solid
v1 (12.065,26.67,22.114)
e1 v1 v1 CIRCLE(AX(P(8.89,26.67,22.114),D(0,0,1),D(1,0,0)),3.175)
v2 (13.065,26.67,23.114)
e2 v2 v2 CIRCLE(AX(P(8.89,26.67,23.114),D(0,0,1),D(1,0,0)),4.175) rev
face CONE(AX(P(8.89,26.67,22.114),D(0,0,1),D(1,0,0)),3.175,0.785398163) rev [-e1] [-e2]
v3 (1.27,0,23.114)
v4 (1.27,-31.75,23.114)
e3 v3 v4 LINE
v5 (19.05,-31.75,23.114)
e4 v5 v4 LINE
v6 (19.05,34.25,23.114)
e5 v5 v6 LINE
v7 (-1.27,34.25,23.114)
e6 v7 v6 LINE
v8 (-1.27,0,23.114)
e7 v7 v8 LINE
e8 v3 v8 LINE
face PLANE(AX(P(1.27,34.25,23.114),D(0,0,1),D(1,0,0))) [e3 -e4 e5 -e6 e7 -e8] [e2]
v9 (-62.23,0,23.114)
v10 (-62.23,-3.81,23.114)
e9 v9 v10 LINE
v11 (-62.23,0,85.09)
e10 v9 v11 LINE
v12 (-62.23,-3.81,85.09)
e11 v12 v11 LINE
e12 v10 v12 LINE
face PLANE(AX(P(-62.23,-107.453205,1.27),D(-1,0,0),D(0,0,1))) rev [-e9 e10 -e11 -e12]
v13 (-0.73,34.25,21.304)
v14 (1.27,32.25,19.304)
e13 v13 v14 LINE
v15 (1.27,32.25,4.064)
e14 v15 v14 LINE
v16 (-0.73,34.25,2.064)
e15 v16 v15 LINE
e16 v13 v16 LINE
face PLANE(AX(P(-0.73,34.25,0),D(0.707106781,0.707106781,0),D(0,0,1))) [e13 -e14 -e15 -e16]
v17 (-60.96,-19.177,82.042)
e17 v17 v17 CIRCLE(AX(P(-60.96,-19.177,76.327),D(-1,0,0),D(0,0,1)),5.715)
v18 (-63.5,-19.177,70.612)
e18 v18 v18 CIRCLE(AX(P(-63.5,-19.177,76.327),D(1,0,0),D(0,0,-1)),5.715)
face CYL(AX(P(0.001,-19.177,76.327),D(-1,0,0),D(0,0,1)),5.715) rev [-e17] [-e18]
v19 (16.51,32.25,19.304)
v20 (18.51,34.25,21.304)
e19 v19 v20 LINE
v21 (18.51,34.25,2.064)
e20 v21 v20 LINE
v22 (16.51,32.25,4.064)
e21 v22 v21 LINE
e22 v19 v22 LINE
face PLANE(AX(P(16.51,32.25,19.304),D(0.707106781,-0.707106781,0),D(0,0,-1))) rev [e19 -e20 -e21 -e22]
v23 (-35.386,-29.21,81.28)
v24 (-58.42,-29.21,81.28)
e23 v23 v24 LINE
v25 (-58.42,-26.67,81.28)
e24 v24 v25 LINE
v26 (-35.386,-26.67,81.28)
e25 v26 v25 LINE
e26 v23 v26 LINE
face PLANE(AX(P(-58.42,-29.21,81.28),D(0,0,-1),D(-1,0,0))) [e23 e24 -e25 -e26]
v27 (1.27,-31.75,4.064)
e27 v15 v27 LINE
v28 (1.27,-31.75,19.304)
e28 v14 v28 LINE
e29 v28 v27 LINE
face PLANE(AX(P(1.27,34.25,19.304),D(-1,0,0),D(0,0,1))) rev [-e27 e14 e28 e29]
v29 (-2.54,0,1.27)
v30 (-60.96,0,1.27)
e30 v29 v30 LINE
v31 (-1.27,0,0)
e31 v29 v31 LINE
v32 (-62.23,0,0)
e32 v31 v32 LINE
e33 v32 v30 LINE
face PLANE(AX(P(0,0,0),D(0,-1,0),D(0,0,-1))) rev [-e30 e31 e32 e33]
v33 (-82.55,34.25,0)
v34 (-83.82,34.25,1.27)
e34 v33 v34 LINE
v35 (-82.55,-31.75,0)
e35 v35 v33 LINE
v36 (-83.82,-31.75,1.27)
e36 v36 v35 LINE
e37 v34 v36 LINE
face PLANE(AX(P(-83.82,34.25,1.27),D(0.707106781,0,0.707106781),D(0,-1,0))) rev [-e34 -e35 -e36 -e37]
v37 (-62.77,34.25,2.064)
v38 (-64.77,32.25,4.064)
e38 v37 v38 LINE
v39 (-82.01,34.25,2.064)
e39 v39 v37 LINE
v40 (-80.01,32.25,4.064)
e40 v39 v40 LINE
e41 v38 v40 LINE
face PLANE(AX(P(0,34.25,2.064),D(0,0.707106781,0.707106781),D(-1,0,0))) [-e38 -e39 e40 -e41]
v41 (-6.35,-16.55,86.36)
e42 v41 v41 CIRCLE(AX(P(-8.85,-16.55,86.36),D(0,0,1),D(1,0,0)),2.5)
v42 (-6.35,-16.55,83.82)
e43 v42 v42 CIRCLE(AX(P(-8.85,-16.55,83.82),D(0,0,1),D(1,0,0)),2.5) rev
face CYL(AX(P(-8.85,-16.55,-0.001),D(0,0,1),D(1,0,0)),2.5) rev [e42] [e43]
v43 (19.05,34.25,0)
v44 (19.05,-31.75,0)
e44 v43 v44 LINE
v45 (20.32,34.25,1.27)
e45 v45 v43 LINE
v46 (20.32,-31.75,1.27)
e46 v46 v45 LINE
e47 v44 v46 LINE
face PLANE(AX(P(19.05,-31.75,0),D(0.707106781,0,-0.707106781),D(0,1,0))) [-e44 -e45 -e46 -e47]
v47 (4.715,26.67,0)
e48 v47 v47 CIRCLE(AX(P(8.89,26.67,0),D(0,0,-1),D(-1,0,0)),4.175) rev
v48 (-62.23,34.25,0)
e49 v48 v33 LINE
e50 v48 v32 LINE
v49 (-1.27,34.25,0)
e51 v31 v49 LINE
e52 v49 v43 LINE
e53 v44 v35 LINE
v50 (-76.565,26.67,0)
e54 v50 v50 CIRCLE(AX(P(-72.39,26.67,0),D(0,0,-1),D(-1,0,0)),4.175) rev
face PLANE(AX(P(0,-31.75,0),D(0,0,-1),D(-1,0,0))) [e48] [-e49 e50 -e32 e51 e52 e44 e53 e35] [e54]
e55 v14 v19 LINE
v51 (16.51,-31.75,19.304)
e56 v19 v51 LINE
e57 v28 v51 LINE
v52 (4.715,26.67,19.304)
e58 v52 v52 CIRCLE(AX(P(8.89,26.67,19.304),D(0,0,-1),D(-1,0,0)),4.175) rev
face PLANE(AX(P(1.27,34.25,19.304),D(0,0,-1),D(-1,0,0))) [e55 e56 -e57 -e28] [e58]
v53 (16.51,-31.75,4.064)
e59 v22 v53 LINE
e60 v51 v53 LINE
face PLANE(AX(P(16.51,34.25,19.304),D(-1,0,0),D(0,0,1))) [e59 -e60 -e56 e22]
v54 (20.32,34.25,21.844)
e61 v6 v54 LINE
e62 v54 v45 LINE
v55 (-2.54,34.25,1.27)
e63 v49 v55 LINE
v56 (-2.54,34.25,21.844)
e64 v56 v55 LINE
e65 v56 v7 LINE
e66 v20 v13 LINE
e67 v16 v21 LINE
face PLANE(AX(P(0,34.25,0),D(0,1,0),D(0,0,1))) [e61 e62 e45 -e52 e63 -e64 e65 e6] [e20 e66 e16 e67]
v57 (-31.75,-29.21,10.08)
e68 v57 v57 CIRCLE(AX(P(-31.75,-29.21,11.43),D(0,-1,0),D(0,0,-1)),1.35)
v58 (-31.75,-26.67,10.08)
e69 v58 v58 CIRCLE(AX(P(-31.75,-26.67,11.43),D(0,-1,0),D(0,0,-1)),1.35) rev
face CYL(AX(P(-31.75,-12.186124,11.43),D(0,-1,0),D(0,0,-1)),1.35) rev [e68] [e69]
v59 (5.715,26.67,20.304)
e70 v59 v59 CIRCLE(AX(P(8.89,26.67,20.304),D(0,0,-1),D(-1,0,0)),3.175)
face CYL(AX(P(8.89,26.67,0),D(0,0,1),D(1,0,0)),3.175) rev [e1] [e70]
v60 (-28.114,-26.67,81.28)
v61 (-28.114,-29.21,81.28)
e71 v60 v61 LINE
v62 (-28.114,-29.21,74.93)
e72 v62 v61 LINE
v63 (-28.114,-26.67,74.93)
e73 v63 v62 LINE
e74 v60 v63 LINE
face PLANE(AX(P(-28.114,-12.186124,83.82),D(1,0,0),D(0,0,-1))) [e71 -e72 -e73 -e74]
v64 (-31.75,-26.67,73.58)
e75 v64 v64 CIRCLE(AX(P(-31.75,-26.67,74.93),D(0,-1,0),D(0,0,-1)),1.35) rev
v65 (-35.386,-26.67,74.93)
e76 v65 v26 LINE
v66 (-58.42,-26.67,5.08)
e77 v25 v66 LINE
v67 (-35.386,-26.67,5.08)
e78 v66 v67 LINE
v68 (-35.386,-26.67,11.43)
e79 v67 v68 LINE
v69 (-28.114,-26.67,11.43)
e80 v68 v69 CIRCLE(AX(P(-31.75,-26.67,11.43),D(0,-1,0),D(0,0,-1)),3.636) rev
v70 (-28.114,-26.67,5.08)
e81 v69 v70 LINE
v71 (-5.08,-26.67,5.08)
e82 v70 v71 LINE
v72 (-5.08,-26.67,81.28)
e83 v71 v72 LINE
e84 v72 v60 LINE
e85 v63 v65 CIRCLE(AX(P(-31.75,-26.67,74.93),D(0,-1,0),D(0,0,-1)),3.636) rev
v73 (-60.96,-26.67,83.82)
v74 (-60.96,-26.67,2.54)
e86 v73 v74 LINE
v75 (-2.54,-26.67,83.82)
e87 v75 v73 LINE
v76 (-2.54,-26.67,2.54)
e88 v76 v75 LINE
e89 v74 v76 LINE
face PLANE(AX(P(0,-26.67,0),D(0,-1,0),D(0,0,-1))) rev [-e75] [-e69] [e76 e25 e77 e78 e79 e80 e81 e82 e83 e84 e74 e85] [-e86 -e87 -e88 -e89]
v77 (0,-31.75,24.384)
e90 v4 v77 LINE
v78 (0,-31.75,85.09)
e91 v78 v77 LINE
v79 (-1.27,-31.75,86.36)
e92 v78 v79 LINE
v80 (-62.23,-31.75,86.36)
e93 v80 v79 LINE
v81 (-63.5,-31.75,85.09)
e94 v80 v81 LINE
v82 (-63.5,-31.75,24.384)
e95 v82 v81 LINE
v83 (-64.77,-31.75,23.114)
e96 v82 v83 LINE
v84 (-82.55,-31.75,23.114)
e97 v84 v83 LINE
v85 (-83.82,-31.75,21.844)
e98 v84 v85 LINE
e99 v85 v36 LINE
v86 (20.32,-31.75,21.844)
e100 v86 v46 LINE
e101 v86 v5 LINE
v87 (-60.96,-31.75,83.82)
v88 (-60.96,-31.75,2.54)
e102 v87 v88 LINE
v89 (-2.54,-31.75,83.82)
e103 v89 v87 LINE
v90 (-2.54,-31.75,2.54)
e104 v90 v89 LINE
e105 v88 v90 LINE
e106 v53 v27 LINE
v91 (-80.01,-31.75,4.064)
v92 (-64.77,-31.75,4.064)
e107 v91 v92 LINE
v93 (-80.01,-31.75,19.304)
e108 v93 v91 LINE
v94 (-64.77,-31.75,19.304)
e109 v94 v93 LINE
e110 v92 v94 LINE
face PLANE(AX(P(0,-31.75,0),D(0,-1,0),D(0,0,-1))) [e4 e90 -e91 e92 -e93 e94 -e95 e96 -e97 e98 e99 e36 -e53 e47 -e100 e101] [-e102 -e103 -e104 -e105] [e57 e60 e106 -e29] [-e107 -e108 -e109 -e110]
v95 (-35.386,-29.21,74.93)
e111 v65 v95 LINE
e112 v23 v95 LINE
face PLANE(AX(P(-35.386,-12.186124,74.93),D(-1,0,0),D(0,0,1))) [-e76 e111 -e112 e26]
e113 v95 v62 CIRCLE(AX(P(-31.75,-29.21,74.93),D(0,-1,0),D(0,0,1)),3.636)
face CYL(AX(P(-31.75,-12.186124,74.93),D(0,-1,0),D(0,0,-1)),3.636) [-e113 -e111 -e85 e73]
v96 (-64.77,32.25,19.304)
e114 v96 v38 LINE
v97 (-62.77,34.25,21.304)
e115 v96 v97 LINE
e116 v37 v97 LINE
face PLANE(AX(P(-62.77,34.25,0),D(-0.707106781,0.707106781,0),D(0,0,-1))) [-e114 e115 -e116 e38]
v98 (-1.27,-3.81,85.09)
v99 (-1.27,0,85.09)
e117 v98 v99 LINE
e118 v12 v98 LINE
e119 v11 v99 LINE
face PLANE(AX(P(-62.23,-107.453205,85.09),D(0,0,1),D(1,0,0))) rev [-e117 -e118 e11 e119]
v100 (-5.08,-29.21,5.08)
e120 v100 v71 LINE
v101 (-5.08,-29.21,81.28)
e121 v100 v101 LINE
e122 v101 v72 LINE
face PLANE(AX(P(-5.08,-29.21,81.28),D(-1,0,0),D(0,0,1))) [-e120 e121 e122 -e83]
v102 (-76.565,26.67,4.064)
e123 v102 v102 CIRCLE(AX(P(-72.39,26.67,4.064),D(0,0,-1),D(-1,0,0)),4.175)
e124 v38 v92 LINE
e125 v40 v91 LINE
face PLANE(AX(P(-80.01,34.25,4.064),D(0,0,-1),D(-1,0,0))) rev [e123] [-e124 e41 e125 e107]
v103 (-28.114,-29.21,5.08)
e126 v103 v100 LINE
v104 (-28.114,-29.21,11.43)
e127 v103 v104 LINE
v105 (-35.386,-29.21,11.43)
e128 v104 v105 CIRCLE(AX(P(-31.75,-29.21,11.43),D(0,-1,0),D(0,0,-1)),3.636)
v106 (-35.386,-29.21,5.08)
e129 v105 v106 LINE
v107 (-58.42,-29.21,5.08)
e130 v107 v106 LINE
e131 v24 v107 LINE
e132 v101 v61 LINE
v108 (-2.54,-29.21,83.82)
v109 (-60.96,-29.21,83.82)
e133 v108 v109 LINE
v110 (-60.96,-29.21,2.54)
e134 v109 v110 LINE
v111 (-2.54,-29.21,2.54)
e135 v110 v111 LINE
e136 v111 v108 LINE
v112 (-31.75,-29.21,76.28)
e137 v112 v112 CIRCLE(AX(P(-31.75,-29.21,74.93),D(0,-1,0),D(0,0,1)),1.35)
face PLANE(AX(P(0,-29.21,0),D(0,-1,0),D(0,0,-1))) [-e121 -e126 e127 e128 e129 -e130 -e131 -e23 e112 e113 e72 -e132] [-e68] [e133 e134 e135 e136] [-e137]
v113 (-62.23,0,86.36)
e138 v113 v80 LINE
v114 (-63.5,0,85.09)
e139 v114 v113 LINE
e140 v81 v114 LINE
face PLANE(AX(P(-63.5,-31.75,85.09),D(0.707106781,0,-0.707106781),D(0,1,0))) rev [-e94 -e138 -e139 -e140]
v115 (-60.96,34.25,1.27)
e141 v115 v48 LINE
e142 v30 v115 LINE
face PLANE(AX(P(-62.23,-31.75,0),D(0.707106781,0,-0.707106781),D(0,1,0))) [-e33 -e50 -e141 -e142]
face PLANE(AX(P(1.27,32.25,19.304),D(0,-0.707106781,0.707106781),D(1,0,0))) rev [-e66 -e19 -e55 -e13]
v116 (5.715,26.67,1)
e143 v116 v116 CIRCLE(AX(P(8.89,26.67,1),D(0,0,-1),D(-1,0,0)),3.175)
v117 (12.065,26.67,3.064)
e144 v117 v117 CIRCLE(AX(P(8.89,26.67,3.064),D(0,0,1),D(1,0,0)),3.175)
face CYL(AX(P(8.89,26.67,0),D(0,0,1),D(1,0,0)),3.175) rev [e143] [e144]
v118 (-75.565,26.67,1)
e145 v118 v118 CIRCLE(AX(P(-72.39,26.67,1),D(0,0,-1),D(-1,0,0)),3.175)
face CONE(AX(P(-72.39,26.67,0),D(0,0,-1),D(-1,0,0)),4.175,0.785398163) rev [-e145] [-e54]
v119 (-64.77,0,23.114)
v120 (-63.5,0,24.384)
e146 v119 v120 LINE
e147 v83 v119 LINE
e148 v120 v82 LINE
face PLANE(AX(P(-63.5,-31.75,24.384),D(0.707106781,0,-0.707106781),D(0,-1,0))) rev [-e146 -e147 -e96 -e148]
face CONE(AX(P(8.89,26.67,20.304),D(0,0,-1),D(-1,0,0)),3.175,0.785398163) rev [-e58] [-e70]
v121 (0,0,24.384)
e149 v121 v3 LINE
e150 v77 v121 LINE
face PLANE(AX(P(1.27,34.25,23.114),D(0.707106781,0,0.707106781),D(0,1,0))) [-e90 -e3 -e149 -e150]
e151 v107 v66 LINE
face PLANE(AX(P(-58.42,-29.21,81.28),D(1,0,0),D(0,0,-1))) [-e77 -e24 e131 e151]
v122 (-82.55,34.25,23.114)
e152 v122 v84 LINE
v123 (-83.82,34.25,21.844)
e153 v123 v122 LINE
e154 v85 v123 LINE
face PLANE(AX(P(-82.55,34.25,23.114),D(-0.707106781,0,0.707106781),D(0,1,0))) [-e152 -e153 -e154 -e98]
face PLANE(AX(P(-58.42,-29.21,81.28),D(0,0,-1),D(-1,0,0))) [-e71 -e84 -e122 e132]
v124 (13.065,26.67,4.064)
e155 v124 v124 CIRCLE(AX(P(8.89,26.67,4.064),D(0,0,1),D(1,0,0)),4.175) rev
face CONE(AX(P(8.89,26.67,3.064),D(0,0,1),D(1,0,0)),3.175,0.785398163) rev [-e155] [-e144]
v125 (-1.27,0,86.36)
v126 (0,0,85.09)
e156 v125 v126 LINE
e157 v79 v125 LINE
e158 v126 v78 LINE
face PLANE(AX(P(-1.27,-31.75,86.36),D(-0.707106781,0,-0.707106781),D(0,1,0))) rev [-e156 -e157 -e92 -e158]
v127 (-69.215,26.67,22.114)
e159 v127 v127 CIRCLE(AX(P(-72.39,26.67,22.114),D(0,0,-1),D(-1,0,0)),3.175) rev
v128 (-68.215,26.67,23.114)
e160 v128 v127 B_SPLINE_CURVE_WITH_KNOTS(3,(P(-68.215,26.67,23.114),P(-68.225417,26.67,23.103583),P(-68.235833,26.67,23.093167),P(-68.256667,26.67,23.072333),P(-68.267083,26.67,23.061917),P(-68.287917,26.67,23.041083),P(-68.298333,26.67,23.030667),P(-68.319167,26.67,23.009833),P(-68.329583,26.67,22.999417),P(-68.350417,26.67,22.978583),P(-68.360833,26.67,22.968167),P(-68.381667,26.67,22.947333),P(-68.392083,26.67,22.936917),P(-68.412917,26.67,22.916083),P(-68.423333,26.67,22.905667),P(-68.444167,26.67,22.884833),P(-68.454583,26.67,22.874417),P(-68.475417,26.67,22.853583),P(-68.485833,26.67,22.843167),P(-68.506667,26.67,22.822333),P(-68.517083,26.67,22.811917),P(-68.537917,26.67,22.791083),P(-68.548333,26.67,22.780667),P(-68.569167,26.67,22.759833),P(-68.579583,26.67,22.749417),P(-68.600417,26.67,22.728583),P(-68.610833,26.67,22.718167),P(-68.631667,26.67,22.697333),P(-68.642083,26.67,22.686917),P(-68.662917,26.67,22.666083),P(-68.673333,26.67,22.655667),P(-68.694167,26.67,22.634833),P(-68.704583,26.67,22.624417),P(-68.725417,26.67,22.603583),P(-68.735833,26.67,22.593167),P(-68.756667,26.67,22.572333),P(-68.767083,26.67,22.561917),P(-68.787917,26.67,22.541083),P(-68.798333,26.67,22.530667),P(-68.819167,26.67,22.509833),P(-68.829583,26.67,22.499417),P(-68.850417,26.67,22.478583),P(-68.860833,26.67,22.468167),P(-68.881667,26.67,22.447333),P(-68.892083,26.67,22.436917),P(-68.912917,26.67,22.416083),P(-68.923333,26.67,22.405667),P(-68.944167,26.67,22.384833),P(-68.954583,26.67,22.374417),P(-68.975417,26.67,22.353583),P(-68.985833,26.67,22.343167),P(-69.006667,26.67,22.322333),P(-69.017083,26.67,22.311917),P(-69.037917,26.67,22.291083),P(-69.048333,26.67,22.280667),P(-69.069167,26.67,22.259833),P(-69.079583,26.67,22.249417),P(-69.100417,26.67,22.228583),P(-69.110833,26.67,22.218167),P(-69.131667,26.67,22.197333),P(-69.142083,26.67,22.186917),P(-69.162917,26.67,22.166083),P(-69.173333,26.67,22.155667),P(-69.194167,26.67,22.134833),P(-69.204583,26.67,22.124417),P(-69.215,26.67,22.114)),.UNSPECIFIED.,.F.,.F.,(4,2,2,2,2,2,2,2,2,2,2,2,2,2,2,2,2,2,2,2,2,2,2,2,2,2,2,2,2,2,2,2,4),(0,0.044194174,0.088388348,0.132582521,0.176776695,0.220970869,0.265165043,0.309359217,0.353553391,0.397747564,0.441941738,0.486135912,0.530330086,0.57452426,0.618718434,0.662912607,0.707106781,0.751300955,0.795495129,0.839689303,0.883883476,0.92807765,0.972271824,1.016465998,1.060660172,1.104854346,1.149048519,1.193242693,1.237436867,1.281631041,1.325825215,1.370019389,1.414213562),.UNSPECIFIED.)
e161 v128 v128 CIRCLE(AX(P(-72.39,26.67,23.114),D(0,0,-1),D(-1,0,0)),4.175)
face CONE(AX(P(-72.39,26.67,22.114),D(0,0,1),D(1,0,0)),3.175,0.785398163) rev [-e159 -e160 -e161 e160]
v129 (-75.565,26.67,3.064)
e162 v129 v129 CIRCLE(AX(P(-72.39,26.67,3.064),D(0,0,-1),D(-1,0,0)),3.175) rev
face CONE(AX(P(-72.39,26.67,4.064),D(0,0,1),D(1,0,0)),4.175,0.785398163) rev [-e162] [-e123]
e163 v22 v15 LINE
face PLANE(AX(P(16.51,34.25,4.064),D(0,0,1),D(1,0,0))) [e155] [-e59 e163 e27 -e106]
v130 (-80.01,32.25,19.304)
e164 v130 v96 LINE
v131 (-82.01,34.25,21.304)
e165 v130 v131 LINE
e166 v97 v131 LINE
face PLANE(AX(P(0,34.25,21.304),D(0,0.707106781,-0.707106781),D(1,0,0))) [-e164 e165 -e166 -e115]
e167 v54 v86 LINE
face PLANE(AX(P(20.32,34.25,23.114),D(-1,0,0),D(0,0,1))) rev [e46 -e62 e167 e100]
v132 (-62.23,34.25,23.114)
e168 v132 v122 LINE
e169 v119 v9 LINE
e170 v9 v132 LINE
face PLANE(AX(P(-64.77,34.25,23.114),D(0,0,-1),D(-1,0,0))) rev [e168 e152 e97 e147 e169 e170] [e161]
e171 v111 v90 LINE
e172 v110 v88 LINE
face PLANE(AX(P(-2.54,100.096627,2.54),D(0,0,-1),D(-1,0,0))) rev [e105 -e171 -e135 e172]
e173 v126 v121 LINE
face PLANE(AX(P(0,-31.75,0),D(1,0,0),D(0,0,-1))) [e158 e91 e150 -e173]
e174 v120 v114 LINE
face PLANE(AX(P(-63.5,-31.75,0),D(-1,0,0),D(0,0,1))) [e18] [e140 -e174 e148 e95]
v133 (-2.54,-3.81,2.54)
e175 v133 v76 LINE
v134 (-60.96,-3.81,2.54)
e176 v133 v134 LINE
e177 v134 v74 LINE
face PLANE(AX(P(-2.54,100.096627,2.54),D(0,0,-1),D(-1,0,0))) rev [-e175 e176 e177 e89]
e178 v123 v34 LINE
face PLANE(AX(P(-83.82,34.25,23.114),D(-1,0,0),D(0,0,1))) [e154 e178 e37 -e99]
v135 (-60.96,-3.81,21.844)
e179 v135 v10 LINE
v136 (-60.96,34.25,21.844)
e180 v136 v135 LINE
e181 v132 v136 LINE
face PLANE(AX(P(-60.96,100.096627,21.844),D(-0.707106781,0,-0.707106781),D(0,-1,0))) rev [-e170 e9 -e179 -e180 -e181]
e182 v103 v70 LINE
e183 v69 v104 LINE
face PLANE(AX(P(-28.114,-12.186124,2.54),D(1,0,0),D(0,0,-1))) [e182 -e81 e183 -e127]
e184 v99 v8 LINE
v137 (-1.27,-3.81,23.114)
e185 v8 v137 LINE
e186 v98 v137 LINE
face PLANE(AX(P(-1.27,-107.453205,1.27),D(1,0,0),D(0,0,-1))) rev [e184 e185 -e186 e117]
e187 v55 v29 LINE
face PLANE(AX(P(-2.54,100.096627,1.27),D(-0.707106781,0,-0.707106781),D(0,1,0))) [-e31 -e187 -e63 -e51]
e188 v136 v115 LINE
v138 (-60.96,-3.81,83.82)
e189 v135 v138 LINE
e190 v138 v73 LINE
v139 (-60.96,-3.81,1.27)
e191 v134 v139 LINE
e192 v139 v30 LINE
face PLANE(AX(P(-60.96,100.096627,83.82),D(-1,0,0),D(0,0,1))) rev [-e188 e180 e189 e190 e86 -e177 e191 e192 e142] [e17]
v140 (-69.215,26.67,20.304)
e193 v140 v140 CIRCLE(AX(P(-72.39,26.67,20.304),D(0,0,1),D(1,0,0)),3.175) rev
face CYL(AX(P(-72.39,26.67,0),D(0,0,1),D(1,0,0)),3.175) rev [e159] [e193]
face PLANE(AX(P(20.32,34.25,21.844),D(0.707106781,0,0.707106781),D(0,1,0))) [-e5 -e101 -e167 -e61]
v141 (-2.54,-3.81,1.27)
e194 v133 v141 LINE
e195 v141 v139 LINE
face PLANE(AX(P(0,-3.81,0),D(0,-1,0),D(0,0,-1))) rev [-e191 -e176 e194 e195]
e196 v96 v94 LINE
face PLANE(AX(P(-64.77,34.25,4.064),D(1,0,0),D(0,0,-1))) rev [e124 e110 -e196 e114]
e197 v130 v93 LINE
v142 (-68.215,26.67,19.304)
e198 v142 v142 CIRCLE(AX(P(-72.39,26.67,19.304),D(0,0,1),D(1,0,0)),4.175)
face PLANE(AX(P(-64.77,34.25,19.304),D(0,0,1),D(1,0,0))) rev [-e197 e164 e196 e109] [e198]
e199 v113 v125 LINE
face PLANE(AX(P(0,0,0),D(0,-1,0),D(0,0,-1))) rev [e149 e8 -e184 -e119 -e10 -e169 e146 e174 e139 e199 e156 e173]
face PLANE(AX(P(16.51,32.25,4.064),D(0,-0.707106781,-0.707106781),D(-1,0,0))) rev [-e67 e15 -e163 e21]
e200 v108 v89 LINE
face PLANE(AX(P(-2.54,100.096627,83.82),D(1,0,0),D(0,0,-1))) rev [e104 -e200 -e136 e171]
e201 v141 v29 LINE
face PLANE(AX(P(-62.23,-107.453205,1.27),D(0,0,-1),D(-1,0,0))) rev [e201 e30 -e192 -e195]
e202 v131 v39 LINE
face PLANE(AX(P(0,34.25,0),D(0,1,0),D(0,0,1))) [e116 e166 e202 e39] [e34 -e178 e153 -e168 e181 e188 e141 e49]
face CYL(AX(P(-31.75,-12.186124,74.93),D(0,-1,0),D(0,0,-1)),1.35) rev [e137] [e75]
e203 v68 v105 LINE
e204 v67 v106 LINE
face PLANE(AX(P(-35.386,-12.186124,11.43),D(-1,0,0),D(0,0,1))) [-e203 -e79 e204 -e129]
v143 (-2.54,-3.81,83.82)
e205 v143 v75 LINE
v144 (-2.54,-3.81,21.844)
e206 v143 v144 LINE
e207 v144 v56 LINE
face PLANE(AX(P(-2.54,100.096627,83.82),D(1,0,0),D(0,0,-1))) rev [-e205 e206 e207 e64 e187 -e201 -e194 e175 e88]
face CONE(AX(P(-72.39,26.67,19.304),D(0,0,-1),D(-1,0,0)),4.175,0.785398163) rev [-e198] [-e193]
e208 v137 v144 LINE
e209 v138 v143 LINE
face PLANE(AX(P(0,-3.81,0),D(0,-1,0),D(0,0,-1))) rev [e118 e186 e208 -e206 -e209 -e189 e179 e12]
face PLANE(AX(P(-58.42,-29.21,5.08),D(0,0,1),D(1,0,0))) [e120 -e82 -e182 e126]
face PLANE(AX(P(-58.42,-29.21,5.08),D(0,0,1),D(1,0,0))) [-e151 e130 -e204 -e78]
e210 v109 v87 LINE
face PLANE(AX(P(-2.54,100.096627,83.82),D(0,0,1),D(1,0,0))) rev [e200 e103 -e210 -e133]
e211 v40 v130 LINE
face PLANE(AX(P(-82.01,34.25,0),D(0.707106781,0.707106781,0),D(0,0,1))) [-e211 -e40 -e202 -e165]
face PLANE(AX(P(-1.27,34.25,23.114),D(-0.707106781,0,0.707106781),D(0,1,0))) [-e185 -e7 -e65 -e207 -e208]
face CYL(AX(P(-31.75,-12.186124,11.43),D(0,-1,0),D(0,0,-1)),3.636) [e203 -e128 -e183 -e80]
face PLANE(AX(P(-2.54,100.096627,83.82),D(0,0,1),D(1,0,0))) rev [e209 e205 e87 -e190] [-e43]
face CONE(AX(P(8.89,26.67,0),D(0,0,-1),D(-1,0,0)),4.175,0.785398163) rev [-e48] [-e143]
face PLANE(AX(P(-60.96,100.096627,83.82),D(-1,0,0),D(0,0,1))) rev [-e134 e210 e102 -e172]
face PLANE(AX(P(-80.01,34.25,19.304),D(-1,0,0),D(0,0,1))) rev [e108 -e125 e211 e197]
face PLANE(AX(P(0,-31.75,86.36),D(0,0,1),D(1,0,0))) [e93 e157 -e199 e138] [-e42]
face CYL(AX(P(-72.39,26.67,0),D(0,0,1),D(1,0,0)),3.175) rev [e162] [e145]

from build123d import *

# Parameters (mm, degrees)
SKETCH3_W                  = 63.5
SKETCH3_H                  = 86.36
BOSS_EXTRUDE2_DEPTH        = 31.75
SKETCH4_W                  = 58.42
SKETCH4_H                  = 81.28
CUT_EXTRUDE2_DEPTH         = 27.94
POWER_JACK_HOLE_REACH      = 113.796
SKETCH5_R                  = 5.715
MOTOR_MOUNTING_SHAPE_DEPTH = 63.5
MOTOR_MOUNTING_HOLES_REACH = 129.254
SKETCH8_R                  = 1.6
SKETCH13_W                 = 60.96
SKETCH13_H                 = 83.82
CUT_EXTRUDE7_DEPTH         = 3.81
SKETCH9_W                  = 15.24
SKETCH9_H                  = 15.24
BOSS_EXTRUDE3_DEPTH        = 66
CHAMFER1_SIZE              = 2
CUT_EXTRUDE5_DEPTH         = 126.858217451
SKETCH12_R                 = 3.175
LEG_HOLES_DEPTH            = 111.448682274
CHAMFER2_SIZE              = 1
BOSS_EXTRUDE5_START        = -5.08
SKETCH14_W                 = 58.42
SKETCH14_H                 = 81.28
SKETCH14_W_2               = 53.34
SKETCH14_H_2               = 76.2
BOSS_EXTRUDE5_DEPTH        = 2.54
CUT_EXTRUDE8_REACH         = 127.128
SKETCH15_R                 = 2.5
CHAMFER3_SIZE              = 1.27
SKETCH16_R                 = 1.35
BOSS_EXTRUDE6_DEPTH        = 2.54


with BuildPart() as part:
    # Sketch3 → Boss-Extrude2 (new body)
    with BuildSketch(Plane(origin=(0, 0, 0), x_dir=(-1, 0, 0), z_dir=(0, 1, 0))):
        with Locations((31.75, 43.18)):
            Rectangle(SKETCH3_W, SKETCH3_H)
    extrude(amount=-BOSS_EXTRUDE2_DEPTH)

    # Sketch4 → Cut-Extrude2 (cut)
    with BuildSketch(Plane.XZ.offset(31.75)):
        with Locations((-31.75, 43.18)):
            Rectangle(SKETCH4_W, SKETCH4_H)
    extrude(amount=-CUT_EXTRUDE2_DEPTH, mode=Mode.SUBTRACT)

    # Sketch5 → Power Jack Hole (cut, up to next)
    with BuildSketch(Plane(origin=(-63.5, 0, 0), x_dir=(0, 0, -1), z_dir=(1, 0, 0)), mode=Mode.PRIVATE) as power_jack_hole_sk1:
        with Locations(Location((-76.327, -19.177, 0), (0, 0, 180))):
            Circle(SKETCH5_R)
    power_jack_hole_tool1 = extrude(power_jack_hole_sk1.sketch, amount=POWER_JACK_HOLE_REACH, mode=Mode.PRIVATE) & part.part
    add(power_jack_hole_tool1.solids().sort_by_distance((-63.5, -19.177, 76.327))[0], mode=Mode.SUBTRACT)

    # Sketch6 → Motor Mounting Shape (add)
    with BuildSketch(Plane.ZY.offset(63.5)):
        Polygon((46.54, 0), (46.54, 36.83), (0, 36.83), (0, 34.29), (44, 34.29), (44, 0), align=None)
    extrude(amount=-MOTOR_MOUNTING_SHAPE_DEPTH)

    # Sketch8 → Motor-Mounting-Holes (cut, up to next)
    with BuildSketch(Plane(origin=(0, 36.83, 0), x_dir=(1, 0, 0), z_dir=(0, 1, 0)), mode=Mode.PRIVATE) as motor_mounting_holes_sk1:
        with Locations(Location((-47.25, -7.77, 0), (0, 0, 270))):
            Circle(SKETCH8_R)
    motor_mounting_holes_tool1 = extrude(motor_mounting_holes_sk1.sketch, amount=-MOTOR_MOUNTING_HOLES_REACH, mode=Mode.PRIVATE) & part.part
    # Sketch8 → Motor-Mounting-Holes (cut, up to next)
    with BuildSketch(Plane(origin=(0, 36.83, 0), x_dir=(1, 0, 0), z_dir=(0, 1, 0)), mode=Mode.PRIVATE) as motor_mounting_holes_sk2:
        with Locations(Location((-16.25, -7.77, 0), (0, 0, 270))):
            Circle(SKETCH8_R)
    motor_mounting_holes_tool2 = extrude(motor_mounting_holes_sk2.sketch, amount=-MOTOR_MOUNTING_HOLES_REACH, mode=Mode.PRIVATE) & part.part
    # Sketch8 → Motor-Mounting-Holes (cut, up to next)
    with BuildSketch(Plane(origin=(0, 36.83, 0), x_dir=(1, 0, 0), z_dir=(0, 1, 0)), mode=Mode.PRIVATE) as motor_mounting_holes_sk3:
        with Locations(Location((-16.25, -38.77, 0), (0, 0, 270))):
            Circle(SKETCH8_R)
    motor_mounting_holes_tool3 = extrude(motor_mounting_holes_sk3.sketch, amount=-MOTOR_MOUNTING_HOLES_REACH, mode=Mode.PRIVATE) & part.part
    # Sketch8 → Motor-Mounting-Holes (cut, up to next)
    with BuildSketch(Plane(origin=(0, 36.83, 0), x_dir=(1, 0, 0), z_dir=(0, 1, 0)), mode=Mode.PRIVATE) as motor_mounting_holes_sk4:
        with Locations(Location((-47.25, -38.77, 0), (0, 0, 270))):
            Circle(SKETCH8_R)
    motor_mounting_holes_tool4 = extrude(motor_mounting_holes_sk4.sketch, amount=-MOTOR_MOUNTING_HOLES_REACH, mode=Mode.PRIVATE) & part.part
    # Sketch8 → Motor-Mounting-Holes (cut, up to next)
    with BuildSketch(Plane(origin=(0, 36.83, 0), x_dir=(1, 0, 0), z_dir=(0, 1, 0)), mode=Mode.PRIVATE) as motor_mounting_holes_sk5:
        with BuildLine():
            Line((-40.64, 0), (-22.86, 0))
            Line((-22.86, 0), (-22.86, -23.27))
            ThreePointArc((-22.86, -23.27), (-31.75, -32.16), (-40.64, -23.27))
            Line((-40.64, -23.27), (-40.64, 0))
        make_face()
    motor_mounting_holes_tool5 = extrude(motor_mounting_holes_sk5.sketch, amount=-MOTOR_MOUNTING_HOLES_REACH, mode=Mode.PRIVATE) & part.part
    add(motor_mounting_holes_tool1.solids().sort_by_distance((-47.25, 36.83, 7.77))[0], mode=Mode.SUBTRACT)
    add(motor_mounting_holes_tool2.solids().sort_by_distance((-16.25, 36.83, 7.77))[0], mode=Mode.SUBTRACT)
    add(motor_mounting_holes_tool3.solids().sort_by_distance((-16.25, 36.83, 38.77))[0], mode=Mode.SUBTRACT)
    add(motor_mounting_holes_tool4.solids().sort_by_distance((-47.25, 36.83, 38.77))[0], mode=Mode.SUBTRACT)
    add(motor_mounting_holes_tool5.solids().sort_by_distance((-31.75, 36.83, 15.191166))[0], mode=Mode.SUBTRACT)

    # Sketch13 → Cut-Extrude7 (cut)
    with BuildSketch(Plane(origin=(0, 0, 0), x_dir=(1, 0, 0), z_dir=(0, 1, 0))):
        with Locations((-31.75, -43.18)):
            Rectangle(SKETCH13_W, SKETCH13_H)
    extrude(amount=-CUT_EXTRUDE7_DEPTH, mode=Mode.SUBTRACT)

    # Sketch9 → Boss-Extrude3 (add)
    # profile 1 of 2: a face of its own
    with BuildSketch(Plane.XZ.offset(31.75)):
        Polygon((1.27, 23.114), (-2.54, 23.114), (-2.54, 0), (1.27, 0), (20.32, 0), (20.32, 23.114), align=None)
        with Locations((8.89, 11.684)):
            Rectangle(SKETCH9_W, SKETCH9_H, mode=Mode.SUBTRACT)
    # profile 2 of 2: a face of its own
    with BuildSketch(Plane.XZ.offset(31.75)):
        Polygon((-60.96, 0), (-64.77, 0), (-83.82, 0), (-83.82, 23.114), (-64.77, 23.114), (-60.96, 23.114), align=None)
        with Locations((-72.39, 11.684)):
            Rectangle(SKETCH9_W, SKETCH9_H, mode=Mode.SUBTRACT)
    extrude(amount=-BOSS_EXTRUDE3_DEPTH)

    # Chamfer1
    chamfer1_edges = [part.edges().sort_by_distance(p)[0] for p in [
        (1.27, 34.25, 11.684),
        (8.89, 34.25, 19.304),
        (16.51, 34.25, 11.684),
        (8.89, 34.25, 4.064),
        (-72.39, 34.25, 19.304),
        (-80.01, 34.25, 11.684),
        (-72.39, 34.25, 4.064),
        (-64.77, 34.25, 11.684),
    ]]
    chamfer(chamfer1_edges, length=CHAMFER1_SIZE)

    # Sketch11 → Cut-Extrude5 (cut, through all)
    with BuildSketch(Plane(origin=(0, 0, 0), x_dir=(0, 0, -1), z_dir=(1, 0, 0))):
        Polygon((-44, 0), (-44, 34.29), (0, 34.29), (0, 36.83), (-86.36, 36.83), (-86.36, 0), align=None)
    extrude(amount=-CUT_EXTRUDE5_DEPTH, mode=Mode.SUBTRACT)

    # Sketch12 → Leg Holes (cut, through all)
    with BuildSketch(Plane.XY.offset(23.114)):
        with Locations((8.89, 26.67)):
            Circle(SKETCH12_R)
        with Locations((-72.39, 26.67)):
            Circle(SKETCH12_R)
    extrude(amount=-LEG_HOLES_DEPTH, mode=Mode.SUBTRACT)

    # Chamfer2
    chamfer2_edges = [part.edges().sort_by_distance(p)[0] for p in [
        (5.715, 26.67, 4.064),
        (5.715, 26.67, 19.304),
        (5.715, 26.67, 0),
        (5.715, 26.67, 23.114),
        (-75.565, 26.67, 19.304),
        (-75.565, 26.67, 0),
        (-75.565, 26.67, 4.064),
        (-75.565, 26.67, 23.114),
    ]]
    chamfer(chamfer2_edges, length=CHAMFER2_SIZE)

    # Sketch14 → Boss-Extrude5 (add)
    with BuildSketch(Plane.XZ.offset(31.75).offset(BOSS_EXTRUDE5_START)):
        with Locations((-31.75, 43.18)):
            Rectangle(SKETCH14_W, SKETCH14_H)
        with Locations((-31.75, 43.18)):
            Rectangle(SKETCH14_W_2, SKETCH14_H_2, mode=Mode.SUBTRACT)
    extrude(amount=BOSS_EXTRUDE5_DEPTH)

    # Sketch15 → Cut-Extrude8 (cut, up to next)
    with BuildSketch(Plane.XY.offset(86.36), mode=Mode.PRIVATE) as cut_extrude8_sk1:
        with Locations((-8.85, -16.55)):
            Circle(SKETCH15_R)
    cut_extrude8_tool1 = extrude(cut_extrude8_sk1.sketch, amount=-CUT_EXTRUDE8_REACH, mode=Mode.PRIVATE) & part.part
    add(cut_extrude8_tool1.solids().sort_by_distance((-8.85, -16.55, 86.36))[0], mode=Mode.SUBTRACT)

    # Chamfer3
    chamfer3_edges = [part.edges().sort_by_distance(p)[0] for p in [
        (20.32, 1.25, 0),
        (-2.54, 17.125, 0),
        (0, -15.875, 23.114),
        (-2.54, 15.22, 23.114),
        (20.32, 1.25, 23.114),
        (-60.96, 17.125, 0),
        (-60.96, 15.22, 23.114),
        (-63.5, -15.875, 23.114),
        (-83.82, 1.25, 0),
        (-83.82, 1.25, 23.114),
        (0, -15.875, 86.36),
        (-63.5, -15.875, 86.36),
    ]]
    chamfer(chamfer3_edges, length=CHAMFER3_SIZE - 0.0001)  # a hair under: the kernel refuses the full size

    # Sketch16 → Boss-Extrude6 (add)
    # profile 1 of 2: a face of its own
    with BuildSketch(Plane.XZ.offset(29.21)):
        with BuildLine():
            Line((-35.386, 2.54), (-28.114, 2.54))
            Line((-28.114, 2.54), (-28.114, 11.43))
            ThreePointArc((-28.114, 11.43), (-31.75, 15.066), (-35.386, 11.43))
            Line((-35.386, 11.43), (-35.386, 2.54))
        make_face()
        with Locations(Location((-31.75, 11.43, 0), (0, 0, 270))):
            Circle(SKETCH16_R, mode=Mode.SUBTRACT)
    # profile 2 of 2: a face of its own
    with BuildSketch(Plane.XZ.offset(29.21)):
        with BuildLine():
            Line((-35.386, 74.93), (-35.386, 83.82))
            Line((-35.386, 83.82), (-28.114, 83.82))
            Line((-28.114, 83.82), (-28.114, 74.93))
            ThreePointArc((-28.114, 74.93), (-31.75, 71.294), (-35.386, 74.93))
        make_face()
        with Locations(Location((-31.75, 74.93, 0), (0, 0, 270))):
            Circle(SKETCH16_R, mode=Mode.SUBTRACT)
    extrude(amount=-BOSS_EXTRUDE6_DEPTH)


solid = part.part
